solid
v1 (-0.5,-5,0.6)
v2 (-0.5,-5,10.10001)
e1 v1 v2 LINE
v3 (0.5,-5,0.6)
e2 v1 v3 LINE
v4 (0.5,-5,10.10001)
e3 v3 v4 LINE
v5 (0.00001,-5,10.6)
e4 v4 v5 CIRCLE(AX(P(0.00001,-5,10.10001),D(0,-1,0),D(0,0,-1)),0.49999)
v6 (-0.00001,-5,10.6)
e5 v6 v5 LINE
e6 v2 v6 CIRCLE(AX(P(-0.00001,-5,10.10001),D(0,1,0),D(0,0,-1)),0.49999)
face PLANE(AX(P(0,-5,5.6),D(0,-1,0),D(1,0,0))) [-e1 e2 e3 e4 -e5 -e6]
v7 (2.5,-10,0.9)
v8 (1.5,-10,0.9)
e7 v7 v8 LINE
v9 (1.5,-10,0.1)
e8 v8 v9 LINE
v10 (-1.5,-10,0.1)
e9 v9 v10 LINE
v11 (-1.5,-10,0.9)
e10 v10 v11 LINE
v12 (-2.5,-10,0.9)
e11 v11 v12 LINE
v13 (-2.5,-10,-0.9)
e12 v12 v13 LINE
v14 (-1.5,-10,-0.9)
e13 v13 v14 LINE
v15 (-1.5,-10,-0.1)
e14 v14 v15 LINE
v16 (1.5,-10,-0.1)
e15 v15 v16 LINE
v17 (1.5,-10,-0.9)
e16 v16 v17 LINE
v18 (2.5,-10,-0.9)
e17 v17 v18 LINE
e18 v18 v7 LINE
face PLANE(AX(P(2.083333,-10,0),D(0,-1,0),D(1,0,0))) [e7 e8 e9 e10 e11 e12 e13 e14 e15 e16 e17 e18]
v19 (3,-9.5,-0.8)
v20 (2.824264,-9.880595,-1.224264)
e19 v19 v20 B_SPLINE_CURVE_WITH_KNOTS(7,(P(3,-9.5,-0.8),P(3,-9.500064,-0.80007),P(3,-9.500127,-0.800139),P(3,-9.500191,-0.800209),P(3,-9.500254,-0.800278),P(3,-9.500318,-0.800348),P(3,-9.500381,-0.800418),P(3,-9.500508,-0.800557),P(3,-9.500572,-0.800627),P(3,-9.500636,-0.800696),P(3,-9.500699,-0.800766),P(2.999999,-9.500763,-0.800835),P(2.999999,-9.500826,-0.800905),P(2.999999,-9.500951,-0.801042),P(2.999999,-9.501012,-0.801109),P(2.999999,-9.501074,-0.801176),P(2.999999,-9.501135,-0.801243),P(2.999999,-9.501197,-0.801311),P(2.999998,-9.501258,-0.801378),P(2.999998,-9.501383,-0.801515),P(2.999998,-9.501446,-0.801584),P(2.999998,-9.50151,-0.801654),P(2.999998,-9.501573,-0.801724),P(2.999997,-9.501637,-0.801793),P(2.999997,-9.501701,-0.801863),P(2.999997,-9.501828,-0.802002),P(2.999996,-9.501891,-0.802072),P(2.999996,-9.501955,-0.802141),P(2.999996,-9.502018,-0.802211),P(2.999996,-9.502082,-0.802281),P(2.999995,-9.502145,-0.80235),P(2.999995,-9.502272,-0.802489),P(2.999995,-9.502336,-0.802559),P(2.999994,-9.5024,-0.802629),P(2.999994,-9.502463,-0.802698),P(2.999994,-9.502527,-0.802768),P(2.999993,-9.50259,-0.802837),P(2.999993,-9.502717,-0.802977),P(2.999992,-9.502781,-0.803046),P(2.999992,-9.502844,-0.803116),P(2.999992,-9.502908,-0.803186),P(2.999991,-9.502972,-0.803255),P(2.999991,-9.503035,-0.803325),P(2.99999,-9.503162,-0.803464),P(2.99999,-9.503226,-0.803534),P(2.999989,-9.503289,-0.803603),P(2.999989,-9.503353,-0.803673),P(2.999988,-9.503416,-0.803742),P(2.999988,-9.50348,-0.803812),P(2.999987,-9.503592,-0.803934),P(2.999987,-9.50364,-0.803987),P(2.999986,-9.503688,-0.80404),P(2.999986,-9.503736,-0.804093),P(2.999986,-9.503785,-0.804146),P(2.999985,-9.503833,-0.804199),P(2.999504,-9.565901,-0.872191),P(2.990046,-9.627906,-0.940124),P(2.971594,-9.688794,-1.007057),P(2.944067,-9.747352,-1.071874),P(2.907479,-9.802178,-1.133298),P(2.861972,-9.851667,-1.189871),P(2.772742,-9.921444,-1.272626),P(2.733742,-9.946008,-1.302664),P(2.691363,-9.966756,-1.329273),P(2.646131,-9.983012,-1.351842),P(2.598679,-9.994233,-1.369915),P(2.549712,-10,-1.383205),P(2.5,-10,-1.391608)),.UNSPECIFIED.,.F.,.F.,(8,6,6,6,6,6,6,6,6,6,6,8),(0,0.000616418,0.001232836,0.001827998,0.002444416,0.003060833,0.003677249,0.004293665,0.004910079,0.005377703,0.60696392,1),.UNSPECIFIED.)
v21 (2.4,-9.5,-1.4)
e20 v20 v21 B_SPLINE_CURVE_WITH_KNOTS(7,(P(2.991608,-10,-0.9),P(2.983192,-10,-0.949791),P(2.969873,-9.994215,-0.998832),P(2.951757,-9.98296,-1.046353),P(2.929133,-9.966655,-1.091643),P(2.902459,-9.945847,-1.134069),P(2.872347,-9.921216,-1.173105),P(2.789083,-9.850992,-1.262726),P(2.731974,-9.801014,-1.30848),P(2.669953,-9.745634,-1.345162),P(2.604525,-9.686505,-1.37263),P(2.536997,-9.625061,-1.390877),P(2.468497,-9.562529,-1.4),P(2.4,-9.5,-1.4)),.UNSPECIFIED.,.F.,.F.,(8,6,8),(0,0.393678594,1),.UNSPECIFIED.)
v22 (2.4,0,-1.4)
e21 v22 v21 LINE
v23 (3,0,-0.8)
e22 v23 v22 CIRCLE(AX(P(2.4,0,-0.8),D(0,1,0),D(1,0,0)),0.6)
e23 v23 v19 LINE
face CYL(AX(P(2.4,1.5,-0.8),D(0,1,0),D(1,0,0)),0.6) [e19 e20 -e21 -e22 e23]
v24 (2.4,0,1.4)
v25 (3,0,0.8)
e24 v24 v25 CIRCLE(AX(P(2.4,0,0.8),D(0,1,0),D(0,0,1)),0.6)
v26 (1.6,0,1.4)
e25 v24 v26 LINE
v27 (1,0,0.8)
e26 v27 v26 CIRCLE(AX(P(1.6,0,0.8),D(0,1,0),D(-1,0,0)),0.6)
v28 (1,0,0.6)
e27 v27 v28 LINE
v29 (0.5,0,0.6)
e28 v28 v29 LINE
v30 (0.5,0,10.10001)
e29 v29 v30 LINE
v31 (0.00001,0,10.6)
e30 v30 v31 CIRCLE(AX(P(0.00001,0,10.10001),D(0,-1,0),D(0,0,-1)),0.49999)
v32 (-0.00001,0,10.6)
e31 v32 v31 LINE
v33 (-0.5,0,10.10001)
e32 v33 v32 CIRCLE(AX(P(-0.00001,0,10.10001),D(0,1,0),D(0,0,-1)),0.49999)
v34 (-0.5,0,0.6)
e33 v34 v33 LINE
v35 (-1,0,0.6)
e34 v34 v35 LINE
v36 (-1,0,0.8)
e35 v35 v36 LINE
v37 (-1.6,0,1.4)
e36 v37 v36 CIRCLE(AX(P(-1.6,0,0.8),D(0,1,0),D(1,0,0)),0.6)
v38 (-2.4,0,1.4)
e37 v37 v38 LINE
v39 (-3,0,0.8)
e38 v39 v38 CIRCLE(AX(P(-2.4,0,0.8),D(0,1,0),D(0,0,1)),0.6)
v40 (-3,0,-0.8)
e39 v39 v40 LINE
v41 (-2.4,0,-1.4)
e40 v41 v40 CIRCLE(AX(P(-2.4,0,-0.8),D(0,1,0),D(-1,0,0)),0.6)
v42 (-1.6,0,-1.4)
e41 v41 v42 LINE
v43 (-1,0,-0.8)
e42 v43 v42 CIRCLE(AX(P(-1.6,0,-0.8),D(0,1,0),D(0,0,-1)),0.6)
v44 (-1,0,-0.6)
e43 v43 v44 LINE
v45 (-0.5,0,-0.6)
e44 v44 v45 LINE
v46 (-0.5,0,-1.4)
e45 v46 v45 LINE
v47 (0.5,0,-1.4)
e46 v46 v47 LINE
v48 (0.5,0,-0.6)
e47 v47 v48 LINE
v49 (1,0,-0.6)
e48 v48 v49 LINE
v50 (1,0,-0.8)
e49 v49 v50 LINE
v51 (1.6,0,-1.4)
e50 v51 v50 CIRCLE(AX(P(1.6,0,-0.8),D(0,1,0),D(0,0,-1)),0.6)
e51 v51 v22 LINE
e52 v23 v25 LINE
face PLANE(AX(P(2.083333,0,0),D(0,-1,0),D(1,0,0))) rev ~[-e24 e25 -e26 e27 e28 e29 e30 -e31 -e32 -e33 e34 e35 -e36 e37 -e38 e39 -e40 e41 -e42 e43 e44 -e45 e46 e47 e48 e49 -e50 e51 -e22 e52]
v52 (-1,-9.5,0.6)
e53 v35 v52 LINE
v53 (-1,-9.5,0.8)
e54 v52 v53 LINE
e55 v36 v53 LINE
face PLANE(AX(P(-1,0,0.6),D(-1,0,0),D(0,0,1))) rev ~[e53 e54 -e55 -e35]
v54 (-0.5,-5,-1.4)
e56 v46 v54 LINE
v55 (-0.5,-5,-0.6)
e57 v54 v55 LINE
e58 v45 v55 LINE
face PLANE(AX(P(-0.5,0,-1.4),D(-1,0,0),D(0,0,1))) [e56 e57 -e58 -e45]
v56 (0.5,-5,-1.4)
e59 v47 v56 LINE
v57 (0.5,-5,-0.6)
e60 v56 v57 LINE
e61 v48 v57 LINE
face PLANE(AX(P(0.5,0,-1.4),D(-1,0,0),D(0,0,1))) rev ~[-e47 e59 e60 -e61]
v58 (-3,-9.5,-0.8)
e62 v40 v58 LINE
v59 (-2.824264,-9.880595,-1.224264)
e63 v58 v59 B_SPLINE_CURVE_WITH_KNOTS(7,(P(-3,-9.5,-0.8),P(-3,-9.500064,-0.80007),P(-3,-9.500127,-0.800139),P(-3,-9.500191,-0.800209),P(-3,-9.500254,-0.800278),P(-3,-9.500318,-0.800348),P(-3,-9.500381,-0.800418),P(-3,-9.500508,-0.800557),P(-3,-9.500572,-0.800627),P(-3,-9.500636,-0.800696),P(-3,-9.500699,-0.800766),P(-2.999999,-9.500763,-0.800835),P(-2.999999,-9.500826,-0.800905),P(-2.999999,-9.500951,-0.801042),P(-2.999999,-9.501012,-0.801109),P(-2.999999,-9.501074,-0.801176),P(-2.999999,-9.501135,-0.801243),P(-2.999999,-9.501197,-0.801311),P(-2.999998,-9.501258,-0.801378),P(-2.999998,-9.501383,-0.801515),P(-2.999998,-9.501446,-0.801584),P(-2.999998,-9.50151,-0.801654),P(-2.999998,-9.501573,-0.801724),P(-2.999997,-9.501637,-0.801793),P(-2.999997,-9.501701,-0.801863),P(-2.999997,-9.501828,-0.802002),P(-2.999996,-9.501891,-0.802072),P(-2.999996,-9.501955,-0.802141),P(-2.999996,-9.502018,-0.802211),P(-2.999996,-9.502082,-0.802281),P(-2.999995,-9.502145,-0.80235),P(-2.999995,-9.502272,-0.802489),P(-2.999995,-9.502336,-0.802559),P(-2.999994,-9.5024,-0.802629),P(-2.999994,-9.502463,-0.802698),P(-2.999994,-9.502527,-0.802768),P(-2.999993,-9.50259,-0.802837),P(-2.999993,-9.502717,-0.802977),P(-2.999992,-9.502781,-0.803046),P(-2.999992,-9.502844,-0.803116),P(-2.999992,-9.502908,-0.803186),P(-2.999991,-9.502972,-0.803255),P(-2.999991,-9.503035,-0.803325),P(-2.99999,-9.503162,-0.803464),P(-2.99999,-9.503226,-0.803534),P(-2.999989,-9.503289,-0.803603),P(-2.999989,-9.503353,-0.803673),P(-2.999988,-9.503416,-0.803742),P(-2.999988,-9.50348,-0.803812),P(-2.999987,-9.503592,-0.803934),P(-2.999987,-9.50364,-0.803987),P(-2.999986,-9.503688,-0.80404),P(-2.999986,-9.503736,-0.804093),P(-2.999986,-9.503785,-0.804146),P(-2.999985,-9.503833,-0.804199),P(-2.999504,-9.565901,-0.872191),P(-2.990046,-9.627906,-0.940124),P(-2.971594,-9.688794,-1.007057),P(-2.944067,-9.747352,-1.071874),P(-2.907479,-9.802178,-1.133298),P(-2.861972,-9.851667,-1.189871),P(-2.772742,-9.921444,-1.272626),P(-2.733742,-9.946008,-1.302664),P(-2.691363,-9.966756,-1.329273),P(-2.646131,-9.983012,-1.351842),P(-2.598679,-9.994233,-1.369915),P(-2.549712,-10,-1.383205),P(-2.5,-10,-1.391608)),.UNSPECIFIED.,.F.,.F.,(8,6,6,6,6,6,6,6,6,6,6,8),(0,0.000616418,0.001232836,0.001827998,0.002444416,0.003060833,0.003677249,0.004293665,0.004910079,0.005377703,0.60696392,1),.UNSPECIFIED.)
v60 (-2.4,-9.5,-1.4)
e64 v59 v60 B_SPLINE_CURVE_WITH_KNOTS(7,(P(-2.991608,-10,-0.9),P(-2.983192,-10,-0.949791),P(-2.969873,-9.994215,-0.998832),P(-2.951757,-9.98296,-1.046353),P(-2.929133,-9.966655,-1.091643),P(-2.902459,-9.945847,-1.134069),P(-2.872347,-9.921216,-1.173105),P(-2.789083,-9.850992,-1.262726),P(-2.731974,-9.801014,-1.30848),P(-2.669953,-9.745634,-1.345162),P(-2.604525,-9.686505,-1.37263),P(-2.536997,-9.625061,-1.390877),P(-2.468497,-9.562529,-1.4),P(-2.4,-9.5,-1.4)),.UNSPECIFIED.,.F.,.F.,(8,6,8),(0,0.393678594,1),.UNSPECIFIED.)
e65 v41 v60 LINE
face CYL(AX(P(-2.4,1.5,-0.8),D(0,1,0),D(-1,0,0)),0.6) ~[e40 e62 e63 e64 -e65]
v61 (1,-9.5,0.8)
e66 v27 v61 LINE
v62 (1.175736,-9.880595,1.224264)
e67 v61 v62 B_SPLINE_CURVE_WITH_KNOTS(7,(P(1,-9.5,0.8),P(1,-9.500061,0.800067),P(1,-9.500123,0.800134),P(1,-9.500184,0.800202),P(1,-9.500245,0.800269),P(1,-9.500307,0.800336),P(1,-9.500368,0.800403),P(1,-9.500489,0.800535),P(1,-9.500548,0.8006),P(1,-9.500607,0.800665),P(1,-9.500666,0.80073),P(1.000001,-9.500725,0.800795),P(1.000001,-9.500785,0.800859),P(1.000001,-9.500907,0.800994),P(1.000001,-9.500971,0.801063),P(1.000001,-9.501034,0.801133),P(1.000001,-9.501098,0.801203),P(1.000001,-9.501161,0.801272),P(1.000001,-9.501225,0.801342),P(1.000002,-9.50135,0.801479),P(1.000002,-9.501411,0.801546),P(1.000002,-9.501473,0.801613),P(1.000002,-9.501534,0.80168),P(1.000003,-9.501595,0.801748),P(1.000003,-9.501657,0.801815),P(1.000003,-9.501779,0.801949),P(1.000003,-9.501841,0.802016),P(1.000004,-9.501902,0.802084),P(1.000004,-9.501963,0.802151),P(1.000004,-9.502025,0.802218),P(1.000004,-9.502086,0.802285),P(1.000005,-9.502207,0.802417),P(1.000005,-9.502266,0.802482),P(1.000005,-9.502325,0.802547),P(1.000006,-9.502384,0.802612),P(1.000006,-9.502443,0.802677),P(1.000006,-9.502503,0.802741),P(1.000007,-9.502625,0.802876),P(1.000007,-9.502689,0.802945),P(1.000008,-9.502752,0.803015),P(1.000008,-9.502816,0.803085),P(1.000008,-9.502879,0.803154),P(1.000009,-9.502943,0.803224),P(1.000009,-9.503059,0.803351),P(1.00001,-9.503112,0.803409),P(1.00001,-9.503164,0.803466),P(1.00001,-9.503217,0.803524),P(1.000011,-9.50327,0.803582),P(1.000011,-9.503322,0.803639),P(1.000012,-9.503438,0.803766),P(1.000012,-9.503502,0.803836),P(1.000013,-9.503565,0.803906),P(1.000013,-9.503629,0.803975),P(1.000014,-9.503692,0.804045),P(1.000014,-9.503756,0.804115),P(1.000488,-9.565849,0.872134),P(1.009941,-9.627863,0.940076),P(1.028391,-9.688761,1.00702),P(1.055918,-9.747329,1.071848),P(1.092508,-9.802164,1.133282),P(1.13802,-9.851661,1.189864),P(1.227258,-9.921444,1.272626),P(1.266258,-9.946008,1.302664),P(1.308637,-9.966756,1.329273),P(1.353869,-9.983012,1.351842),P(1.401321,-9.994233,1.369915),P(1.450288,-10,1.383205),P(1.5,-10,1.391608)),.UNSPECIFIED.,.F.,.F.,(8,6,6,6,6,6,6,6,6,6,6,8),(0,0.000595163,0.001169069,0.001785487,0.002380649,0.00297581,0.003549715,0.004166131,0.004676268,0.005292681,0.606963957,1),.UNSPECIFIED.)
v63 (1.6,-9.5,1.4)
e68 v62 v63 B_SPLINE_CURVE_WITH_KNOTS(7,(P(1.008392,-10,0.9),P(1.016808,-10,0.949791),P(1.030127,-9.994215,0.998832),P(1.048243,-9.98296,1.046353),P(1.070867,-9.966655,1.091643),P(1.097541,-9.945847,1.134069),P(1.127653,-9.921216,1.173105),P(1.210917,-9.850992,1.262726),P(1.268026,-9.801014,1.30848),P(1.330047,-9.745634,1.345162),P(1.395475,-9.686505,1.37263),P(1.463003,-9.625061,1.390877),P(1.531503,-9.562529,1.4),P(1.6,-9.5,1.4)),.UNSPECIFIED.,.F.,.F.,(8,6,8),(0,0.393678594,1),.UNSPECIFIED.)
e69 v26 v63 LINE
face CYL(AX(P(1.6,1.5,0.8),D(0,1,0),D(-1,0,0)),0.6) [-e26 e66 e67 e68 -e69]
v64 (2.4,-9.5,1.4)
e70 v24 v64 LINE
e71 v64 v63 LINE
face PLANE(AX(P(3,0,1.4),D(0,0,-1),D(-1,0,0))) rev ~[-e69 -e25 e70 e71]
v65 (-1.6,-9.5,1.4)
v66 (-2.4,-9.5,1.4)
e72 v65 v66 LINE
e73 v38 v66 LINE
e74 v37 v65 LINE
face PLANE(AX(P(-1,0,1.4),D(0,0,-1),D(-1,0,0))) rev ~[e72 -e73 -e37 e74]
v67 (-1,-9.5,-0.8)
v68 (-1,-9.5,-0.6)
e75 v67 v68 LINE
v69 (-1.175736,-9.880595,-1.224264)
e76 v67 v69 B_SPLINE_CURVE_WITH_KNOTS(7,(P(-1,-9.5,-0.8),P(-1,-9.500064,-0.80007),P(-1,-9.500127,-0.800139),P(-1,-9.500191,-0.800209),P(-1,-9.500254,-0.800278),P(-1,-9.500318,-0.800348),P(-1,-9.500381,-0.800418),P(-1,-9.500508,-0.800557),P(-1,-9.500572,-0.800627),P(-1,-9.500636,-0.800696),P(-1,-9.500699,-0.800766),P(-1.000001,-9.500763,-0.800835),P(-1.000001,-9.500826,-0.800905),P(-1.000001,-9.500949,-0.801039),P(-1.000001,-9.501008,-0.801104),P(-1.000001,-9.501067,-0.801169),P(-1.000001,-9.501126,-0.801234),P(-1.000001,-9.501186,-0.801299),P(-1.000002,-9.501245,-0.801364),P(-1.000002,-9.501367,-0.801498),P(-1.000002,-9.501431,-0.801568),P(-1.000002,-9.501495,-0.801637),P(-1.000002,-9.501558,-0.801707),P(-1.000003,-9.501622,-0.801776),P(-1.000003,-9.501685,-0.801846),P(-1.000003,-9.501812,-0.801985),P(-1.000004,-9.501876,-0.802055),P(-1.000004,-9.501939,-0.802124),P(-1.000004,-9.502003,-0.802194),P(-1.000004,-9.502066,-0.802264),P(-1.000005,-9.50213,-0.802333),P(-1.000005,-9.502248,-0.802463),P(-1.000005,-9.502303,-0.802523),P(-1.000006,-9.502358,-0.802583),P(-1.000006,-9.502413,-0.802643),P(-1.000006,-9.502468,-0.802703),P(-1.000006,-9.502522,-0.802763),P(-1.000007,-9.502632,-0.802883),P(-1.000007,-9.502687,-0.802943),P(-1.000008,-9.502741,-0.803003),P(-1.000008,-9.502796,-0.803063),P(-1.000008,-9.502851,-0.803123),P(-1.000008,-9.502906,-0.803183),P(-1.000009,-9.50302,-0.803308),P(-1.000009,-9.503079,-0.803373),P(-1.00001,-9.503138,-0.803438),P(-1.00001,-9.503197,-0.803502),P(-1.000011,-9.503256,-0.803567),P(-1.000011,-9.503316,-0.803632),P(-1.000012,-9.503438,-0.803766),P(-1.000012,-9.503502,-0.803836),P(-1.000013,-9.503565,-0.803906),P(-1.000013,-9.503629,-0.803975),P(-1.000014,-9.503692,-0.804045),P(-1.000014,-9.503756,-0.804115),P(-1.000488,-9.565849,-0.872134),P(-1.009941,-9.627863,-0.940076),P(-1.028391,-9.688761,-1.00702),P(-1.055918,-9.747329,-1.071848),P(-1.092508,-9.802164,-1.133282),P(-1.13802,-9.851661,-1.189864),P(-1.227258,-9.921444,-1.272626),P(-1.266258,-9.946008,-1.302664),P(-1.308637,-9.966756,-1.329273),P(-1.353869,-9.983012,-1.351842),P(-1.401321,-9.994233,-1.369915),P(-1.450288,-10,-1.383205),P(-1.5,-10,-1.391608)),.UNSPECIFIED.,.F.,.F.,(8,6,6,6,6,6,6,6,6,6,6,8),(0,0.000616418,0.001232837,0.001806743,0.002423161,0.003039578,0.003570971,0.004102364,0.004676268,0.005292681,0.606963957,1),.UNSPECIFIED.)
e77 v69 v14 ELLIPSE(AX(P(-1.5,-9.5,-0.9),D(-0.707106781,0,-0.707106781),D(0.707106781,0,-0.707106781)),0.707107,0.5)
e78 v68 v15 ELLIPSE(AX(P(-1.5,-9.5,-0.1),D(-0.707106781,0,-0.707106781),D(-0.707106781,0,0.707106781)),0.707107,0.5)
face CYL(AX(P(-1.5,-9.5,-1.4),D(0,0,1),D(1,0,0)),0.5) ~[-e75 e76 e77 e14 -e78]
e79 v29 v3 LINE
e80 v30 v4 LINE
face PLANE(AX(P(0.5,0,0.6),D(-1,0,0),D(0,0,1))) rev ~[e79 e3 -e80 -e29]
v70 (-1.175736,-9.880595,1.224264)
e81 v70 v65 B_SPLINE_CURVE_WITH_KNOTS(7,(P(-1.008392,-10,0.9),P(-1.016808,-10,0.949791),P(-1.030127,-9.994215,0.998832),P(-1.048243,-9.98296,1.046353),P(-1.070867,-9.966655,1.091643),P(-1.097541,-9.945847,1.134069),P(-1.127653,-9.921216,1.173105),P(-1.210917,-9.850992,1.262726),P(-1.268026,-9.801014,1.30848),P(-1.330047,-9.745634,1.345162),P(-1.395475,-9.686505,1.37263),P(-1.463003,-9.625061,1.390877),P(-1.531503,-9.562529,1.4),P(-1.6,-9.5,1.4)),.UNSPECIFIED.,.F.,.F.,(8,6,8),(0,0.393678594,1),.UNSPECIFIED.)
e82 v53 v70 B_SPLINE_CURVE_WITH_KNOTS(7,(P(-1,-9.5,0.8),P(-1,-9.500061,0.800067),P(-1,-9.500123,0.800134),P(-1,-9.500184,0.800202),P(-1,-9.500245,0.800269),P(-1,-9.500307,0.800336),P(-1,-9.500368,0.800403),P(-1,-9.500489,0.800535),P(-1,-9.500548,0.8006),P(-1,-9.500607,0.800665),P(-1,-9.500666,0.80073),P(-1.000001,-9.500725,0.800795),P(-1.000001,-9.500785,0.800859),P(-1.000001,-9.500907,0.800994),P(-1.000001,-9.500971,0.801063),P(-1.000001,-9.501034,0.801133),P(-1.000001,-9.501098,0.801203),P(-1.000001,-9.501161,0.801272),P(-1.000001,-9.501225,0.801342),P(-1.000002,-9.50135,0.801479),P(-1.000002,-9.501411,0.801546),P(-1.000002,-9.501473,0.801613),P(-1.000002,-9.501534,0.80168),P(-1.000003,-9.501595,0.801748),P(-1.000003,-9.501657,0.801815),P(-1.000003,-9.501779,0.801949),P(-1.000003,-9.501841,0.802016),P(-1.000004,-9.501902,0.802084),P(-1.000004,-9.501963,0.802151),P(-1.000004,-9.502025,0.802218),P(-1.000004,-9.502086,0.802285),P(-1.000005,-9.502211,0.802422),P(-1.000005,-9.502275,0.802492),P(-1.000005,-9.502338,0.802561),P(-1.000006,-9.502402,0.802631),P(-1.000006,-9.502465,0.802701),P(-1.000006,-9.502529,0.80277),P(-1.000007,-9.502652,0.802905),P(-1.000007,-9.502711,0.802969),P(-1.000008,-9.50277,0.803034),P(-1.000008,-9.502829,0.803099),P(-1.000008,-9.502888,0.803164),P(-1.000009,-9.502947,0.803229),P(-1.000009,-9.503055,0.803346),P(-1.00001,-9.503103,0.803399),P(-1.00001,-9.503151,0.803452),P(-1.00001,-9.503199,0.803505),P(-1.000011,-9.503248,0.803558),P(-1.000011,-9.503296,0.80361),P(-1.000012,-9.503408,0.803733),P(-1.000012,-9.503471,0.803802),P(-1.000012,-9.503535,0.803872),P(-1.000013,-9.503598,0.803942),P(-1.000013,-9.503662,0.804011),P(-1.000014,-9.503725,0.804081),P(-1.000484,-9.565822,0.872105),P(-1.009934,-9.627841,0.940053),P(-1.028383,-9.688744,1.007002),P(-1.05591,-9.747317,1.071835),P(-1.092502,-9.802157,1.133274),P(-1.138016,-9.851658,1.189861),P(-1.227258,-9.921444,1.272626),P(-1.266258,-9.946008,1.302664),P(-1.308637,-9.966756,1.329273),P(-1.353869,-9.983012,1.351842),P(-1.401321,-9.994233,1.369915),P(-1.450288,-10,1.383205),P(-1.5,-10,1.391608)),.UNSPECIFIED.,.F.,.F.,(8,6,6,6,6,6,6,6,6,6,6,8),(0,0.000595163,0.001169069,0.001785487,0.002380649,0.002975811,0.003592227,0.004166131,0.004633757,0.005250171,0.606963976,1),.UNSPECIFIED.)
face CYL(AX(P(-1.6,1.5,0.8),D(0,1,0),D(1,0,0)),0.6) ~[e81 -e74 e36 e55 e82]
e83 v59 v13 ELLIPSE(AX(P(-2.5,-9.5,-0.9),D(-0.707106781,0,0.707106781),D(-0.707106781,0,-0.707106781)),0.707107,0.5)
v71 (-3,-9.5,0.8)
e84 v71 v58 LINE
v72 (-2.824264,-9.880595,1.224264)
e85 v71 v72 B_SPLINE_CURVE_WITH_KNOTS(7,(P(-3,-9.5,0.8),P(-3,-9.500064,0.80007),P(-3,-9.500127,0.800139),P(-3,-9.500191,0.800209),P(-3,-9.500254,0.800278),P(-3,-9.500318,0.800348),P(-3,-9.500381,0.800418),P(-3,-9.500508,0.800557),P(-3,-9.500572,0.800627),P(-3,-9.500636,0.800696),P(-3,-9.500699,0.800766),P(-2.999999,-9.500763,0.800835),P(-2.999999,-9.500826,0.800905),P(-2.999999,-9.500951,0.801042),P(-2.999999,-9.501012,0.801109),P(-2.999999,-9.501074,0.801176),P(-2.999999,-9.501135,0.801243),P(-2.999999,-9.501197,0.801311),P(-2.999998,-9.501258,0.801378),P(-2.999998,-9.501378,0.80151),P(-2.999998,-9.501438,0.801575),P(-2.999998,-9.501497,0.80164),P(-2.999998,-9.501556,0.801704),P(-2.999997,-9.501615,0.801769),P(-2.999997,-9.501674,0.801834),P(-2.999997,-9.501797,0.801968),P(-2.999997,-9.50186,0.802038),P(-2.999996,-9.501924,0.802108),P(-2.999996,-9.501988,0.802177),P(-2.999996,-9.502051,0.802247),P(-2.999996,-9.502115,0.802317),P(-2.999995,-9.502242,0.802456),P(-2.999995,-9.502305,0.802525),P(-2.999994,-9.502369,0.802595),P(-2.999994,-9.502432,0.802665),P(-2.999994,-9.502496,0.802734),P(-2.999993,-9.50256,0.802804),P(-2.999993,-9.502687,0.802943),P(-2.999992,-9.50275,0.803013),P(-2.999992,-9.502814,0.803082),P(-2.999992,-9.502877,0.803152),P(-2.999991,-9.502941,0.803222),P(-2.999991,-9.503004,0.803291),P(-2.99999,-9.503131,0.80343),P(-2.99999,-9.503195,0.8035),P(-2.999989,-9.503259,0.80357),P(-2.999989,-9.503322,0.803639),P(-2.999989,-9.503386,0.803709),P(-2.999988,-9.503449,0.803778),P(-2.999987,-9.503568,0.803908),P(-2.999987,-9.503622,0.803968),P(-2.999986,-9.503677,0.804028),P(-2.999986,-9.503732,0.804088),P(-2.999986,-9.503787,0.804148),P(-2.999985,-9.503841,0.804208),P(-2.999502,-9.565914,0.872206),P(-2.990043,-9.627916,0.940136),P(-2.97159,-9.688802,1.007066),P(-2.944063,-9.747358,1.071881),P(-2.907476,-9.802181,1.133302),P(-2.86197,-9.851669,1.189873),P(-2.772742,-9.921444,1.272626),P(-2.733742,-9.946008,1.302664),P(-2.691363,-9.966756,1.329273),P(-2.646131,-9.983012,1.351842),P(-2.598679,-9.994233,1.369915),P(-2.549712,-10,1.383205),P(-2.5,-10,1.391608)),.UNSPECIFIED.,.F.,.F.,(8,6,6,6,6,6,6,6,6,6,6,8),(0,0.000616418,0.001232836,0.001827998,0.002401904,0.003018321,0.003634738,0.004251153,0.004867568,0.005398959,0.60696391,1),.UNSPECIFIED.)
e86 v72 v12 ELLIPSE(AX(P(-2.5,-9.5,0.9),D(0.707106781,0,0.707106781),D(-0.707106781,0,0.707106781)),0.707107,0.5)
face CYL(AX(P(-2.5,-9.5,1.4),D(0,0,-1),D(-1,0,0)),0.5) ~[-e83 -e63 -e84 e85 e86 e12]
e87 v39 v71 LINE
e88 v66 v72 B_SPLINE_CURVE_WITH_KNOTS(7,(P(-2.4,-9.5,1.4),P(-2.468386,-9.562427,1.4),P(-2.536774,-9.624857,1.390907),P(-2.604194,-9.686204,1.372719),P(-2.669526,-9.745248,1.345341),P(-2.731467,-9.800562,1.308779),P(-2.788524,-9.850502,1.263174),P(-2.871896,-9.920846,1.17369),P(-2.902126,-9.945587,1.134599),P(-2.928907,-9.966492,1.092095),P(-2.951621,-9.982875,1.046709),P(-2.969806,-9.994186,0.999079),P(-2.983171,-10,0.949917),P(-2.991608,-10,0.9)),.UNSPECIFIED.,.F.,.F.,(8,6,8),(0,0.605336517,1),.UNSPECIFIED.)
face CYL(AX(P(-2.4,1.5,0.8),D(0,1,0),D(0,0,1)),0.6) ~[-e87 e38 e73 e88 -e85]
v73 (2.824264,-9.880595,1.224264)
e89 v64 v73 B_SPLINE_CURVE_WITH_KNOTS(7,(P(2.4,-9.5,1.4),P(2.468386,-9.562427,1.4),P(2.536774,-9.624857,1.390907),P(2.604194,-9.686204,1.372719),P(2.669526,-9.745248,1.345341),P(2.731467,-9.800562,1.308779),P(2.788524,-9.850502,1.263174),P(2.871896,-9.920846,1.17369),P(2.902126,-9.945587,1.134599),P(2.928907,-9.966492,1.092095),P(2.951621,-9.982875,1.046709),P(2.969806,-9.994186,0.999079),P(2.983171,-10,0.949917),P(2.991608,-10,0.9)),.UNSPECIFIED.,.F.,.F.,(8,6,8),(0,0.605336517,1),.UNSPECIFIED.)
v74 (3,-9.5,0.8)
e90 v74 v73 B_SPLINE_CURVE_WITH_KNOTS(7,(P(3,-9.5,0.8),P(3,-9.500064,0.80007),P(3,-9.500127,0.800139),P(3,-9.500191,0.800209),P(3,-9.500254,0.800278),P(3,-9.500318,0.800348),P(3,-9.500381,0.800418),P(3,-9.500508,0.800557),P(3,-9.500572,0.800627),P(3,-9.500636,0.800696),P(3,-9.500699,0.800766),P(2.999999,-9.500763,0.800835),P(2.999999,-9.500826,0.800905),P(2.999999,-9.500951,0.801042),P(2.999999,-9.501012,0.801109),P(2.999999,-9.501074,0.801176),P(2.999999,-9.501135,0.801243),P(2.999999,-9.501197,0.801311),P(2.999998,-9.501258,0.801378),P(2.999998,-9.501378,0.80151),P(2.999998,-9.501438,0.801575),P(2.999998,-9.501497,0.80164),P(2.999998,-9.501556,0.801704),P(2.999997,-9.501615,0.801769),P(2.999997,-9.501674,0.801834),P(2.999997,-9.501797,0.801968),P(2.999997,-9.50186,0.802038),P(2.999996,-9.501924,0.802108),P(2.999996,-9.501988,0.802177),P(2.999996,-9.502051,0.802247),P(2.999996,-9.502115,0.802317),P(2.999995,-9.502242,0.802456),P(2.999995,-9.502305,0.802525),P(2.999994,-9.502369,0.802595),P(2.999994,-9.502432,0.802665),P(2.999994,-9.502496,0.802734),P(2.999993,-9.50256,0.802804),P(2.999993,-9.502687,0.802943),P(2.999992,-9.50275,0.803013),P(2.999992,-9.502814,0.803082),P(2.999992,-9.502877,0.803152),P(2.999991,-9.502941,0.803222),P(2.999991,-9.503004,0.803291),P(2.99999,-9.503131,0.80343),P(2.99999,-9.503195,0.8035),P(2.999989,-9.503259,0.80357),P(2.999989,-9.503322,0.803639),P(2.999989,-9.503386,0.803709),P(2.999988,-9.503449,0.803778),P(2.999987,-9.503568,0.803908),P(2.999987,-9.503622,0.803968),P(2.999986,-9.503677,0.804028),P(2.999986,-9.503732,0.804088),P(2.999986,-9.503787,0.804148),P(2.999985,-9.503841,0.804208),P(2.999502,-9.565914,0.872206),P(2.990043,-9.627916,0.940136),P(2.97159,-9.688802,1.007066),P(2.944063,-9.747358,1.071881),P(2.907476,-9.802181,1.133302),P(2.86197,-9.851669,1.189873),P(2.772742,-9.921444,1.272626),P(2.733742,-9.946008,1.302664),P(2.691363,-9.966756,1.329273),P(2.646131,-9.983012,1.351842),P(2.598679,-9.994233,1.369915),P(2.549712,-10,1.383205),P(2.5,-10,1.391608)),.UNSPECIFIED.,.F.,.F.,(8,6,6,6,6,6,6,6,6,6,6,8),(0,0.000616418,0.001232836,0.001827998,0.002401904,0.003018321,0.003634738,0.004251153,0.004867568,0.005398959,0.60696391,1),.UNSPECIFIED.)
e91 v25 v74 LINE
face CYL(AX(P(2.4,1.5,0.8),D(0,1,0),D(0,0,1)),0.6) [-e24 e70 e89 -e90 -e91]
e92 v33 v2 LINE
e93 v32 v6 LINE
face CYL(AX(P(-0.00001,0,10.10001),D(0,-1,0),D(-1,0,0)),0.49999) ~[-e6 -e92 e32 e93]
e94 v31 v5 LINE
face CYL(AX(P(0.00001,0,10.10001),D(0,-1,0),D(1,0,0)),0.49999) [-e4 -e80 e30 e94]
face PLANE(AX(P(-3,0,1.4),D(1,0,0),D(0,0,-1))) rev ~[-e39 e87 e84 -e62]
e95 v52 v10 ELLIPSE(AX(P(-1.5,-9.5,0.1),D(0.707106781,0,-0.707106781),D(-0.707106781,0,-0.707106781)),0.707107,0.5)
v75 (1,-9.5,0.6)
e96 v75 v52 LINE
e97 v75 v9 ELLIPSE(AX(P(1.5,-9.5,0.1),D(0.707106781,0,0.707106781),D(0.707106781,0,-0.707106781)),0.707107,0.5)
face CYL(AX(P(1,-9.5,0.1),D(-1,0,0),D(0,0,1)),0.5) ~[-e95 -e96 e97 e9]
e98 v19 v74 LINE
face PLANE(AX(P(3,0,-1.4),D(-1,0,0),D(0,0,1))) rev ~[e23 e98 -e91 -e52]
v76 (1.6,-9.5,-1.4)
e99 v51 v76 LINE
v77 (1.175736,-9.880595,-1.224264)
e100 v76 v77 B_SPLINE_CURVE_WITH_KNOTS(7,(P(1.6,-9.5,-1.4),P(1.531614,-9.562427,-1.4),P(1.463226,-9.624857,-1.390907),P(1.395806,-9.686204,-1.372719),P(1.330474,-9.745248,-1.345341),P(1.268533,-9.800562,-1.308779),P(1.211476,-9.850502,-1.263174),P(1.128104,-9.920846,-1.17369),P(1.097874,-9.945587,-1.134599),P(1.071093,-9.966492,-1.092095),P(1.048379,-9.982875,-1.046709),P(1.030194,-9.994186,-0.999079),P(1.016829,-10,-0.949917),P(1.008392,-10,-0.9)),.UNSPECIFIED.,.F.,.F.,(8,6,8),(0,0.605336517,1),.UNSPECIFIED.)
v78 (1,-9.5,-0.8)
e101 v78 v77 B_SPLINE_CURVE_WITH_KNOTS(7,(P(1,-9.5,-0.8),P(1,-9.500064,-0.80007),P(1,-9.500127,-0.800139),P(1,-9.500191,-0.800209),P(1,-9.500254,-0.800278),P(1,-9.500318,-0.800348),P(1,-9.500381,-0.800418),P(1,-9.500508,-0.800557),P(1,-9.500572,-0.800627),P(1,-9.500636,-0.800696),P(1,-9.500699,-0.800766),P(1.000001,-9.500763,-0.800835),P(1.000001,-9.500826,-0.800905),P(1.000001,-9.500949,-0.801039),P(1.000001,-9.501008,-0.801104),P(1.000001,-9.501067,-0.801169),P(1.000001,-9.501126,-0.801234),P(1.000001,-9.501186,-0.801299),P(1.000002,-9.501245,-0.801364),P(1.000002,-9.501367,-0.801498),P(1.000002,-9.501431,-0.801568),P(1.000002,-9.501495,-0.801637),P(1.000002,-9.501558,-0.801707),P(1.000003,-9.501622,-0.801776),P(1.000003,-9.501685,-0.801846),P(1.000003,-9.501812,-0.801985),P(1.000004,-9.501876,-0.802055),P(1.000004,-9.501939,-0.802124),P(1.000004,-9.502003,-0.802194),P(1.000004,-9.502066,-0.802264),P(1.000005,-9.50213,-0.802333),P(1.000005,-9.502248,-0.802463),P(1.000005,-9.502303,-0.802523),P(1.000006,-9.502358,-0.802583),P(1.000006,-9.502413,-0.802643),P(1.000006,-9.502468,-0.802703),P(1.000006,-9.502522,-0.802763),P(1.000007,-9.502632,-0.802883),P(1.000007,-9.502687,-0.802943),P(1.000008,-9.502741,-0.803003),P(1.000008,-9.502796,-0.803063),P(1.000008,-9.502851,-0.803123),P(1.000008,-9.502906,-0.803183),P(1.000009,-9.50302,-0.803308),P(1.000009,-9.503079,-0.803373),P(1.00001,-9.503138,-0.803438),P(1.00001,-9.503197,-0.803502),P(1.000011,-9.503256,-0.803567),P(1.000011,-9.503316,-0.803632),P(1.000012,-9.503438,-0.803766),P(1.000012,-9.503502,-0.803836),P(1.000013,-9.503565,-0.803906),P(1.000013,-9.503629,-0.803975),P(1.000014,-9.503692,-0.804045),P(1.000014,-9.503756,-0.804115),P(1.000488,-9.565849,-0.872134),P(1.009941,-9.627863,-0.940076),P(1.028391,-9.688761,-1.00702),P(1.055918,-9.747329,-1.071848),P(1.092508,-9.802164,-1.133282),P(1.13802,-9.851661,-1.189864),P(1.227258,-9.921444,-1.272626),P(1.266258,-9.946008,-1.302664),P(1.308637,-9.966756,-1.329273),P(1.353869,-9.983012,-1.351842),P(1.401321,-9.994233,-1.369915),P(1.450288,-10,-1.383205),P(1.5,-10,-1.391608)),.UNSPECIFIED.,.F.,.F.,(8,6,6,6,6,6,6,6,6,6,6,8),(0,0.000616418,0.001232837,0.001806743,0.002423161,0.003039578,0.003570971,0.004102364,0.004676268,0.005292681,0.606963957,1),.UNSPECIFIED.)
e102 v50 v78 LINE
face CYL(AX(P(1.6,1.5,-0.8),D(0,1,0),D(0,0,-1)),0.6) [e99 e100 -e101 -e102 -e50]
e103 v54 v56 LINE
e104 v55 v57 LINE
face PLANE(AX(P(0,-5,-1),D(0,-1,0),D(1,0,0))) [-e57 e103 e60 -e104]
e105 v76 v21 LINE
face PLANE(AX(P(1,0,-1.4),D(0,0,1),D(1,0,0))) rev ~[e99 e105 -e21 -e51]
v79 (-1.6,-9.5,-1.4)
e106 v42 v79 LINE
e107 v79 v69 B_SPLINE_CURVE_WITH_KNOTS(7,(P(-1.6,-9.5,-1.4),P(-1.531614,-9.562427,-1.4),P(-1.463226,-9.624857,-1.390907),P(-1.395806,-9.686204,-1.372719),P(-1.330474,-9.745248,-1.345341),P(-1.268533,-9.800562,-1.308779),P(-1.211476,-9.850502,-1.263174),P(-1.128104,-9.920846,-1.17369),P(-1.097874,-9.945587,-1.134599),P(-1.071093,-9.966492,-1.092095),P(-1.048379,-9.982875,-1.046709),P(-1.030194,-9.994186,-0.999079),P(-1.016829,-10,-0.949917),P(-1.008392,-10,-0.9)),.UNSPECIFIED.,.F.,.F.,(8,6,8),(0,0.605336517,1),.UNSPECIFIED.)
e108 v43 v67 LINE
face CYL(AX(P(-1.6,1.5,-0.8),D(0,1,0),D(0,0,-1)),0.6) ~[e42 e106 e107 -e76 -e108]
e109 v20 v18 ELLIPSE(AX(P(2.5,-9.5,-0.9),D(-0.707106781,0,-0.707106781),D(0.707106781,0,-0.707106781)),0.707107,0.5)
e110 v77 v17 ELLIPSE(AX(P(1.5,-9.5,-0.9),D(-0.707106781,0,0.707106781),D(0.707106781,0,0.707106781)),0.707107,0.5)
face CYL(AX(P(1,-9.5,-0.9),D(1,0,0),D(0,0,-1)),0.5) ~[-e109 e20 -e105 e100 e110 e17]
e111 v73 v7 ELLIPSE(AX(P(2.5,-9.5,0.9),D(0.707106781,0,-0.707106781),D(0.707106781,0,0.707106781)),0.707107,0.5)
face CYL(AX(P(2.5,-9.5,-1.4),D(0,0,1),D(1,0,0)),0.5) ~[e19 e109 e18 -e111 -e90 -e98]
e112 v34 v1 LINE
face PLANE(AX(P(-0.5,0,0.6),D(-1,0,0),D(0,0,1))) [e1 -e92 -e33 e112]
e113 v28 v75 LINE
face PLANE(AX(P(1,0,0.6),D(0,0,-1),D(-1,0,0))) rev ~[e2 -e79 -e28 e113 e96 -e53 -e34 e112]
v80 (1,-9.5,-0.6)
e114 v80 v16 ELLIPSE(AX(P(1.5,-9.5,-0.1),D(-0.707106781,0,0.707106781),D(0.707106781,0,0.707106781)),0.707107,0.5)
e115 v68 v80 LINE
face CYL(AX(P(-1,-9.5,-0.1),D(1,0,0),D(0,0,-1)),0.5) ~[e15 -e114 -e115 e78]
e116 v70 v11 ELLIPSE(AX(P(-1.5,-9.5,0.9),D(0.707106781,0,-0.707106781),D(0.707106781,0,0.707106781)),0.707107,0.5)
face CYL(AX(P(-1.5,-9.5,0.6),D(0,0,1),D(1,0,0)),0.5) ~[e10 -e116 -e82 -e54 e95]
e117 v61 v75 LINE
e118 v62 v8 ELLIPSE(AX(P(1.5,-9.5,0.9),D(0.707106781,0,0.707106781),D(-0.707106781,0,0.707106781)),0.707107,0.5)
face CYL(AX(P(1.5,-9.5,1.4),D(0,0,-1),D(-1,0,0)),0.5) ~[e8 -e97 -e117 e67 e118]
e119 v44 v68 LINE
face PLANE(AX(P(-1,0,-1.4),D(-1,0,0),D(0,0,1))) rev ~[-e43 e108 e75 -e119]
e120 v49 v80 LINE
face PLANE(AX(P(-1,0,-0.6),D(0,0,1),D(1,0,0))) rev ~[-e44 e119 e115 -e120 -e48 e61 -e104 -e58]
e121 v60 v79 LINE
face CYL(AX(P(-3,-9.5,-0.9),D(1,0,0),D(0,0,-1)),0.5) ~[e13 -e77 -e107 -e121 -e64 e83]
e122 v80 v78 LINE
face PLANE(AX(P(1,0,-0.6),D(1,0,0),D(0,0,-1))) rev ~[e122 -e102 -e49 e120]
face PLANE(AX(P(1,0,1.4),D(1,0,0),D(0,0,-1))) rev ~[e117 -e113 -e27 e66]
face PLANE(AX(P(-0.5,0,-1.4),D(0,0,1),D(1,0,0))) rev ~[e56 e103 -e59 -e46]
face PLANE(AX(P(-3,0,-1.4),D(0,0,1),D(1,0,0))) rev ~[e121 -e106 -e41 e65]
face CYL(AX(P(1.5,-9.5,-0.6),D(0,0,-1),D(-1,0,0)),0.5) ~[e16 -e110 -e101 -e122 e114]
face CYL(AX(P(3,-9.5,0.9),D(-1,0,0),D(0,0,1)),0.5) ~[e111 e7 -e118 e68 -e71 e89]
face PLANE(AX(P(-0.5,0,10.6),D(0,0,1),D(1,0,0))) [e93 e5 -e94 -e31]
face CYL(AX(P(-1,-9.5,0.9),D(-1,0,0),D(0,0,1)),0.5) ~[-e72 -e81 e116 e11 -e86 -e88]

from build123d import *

# Parameters (mm, degrees)
F0_W        = 1.5
F0_H        = 1.2
F0_W_2      = 0.5
F0_W_3      = 1
F1_DEPTH    = 10
F0_H_2      = 10
F0_H_3      = 0.8
F2_DEPTH    = 5
F3_R        = 0.49999
F4_R        = 0.5
F5_T1_DEPTH = 12.5


# Not quite as in the source:
# - a fillet or chamfer that OpenCascade refuses, or shapes differently, is made with other operations: its cross-section is extruded or revolved along the edge and cut away or added
# - a fillet or chamfer is up to 0.001 mm smaller than in the source, because OpenCascade refuses the exact size


with BuildPart() as f1:
    # F0 (on Front) → F1 (new body)
    with BuildSketch(Plane.XZ):
        Polygon((1, 0.6), (2.5, 0.6), (2.5, -0.6), (1, -0.6), (1, -1.4), (3, -1.4), (3, 1.4), (1, 1.4), align=None)
        Polygon((-2.5, 0.6), (-1, 0.6), (-1, 1.4), (-3, 1.4), (-3, -1.4), (-1, -1.4), (-1, -0.6), (-2.5, -0.6), align=None)
        with Locations((1.75, 0)):
            Rectangle(F0_W, F0_H)
        with Locations((0.75, 0)):
            Rectangle(F0_W_2, F0_H)
        with Locations((-0.75, 0)):
            Rectangle(F0_W_2, F0_H)
        with Locations((-1.75, 0)):
            Rectangle(F0_W, F0_H)
        Rectangle(F0_W_3, F0_H)
    extrude(amount=F1_DEPTH)

    # F0 (on Front) → F2 (join)
    with BuildSketch(Plane.XZ):
        with Locations((0, 5.6)):
            Rectangle(F0_W_3, F0_H_2)
        with Locations((0, -1)):
            Rectangle(F0_W_3, F0_H_3)
    extrude(amount=F2_DEPTH)

    # F3 (radius 0.5 in the source; OpenCascade refuses exactly that, so slightly less here)
    f3_edges = [f1.edges().sort_by_distance(p)[0] for p in [
        (0.5, -2.5, 10.6),
        (-0.5, -2.5, 10.6),
    ]]
    fillet(f3_edges, radius=F3_R)

    # F4
    f4_edges = [f1.edges().sort_by_distance(p)[0] for p in [
        (2, -10, -1.4),
        (3, -10, 0),
        (2, -10, 1.4),
        (1, -10, 1),
        (0, -10, 0.6),
        (-1, -10, 1),
        (-2, -10, 1.4),
        (-3, -10, 0),
        (-2, -10, -1.4),
        (-1, -10, -1),
        (0, -10, -0.6),
        (1, -10, -1),
    ]]
    fillet(f4_edges, radius=F4_R)

    # F5: fillet of radius 0.6 on 8 edges, made by hand

    # F5_s2 → F5_t1 (cut)
    with BuildSketch(Plane.XZ.offset(-1.5)):
        with BuildLine():
            ThreePointArc((-2.4, 1.4), (-2.8242640687, 1.2242640687), (-3, 0.8))
            Line((-3, 0.8), (-3, 1.4))
            Line((-3, 1.4), (-2.4, 1.4))
        make_face()
        with BuildLine():
            ThreePointArc((-1, 0.8), (-1.1757359313, 1.2242640687), (-1.6, 1.4))
            Line((-1.6, 1.4), (-1, 1.4))
            Line((-1, 1.4), (-1, 0.8))
        make_face()
        with BuildLine():
            ThreePointArc((1, 0.8), (1.1757359313, 1.2242640687), (1.6, 1.4))
            Line((1.6, 1.4), (1, 1.4))
            Line((1, 1.4), (1, 0.8))
        make_face()
        with BuildLine():
            ThreePointArc((2.4, 1.4), (2.8242640687, 1.2242640687), (3, 0.8))
            Line((3, 0.8), (3, 1.4))
            Line((3, 1.4), (2.4, 1.4))
        make_face()
        with BuildLine():
            ThreePointArc((-3, -0.8), (-2.8242640687, -1.2242640687), (-2.4, -1.4))
            Line((-2.4, -1.4), (-3, -1.4))
            Line((-3, -1.4), (-3, -0.8))
        make_face()
        with BuildLine():
            ThreePointArc((-1.6, -1.4), (-1.1757359313, -1.2242640687), (-1, -0.8))
            Line((-1, -0.8), (-1, -1.4))
            Line((-1, -1.4), (-1.6, -1.4))
        make_face()
        with BuildLine():
            ThreePointArc((1.6, -1.4), (1.1757359313, -1.2242640687), (1, -0.8))
            Line((1, -0.8), (1, -1.4))
            Line((1, -1.4), (1.6, -1.4))
        make_face()
        with BuildLine():
            ThreePointArc((3, -0.8), (2.8242640687, -1.2242640687), (2.4, -1.4))
            Line((2.4, -1.4), (3, -1.4))
            Line((3, -1.4), (3, -0.8))
        make_face()
    extrude(amount=F5_T1_DEPTH, mode=Mode.SUBTRACT)


solid = f1.part
